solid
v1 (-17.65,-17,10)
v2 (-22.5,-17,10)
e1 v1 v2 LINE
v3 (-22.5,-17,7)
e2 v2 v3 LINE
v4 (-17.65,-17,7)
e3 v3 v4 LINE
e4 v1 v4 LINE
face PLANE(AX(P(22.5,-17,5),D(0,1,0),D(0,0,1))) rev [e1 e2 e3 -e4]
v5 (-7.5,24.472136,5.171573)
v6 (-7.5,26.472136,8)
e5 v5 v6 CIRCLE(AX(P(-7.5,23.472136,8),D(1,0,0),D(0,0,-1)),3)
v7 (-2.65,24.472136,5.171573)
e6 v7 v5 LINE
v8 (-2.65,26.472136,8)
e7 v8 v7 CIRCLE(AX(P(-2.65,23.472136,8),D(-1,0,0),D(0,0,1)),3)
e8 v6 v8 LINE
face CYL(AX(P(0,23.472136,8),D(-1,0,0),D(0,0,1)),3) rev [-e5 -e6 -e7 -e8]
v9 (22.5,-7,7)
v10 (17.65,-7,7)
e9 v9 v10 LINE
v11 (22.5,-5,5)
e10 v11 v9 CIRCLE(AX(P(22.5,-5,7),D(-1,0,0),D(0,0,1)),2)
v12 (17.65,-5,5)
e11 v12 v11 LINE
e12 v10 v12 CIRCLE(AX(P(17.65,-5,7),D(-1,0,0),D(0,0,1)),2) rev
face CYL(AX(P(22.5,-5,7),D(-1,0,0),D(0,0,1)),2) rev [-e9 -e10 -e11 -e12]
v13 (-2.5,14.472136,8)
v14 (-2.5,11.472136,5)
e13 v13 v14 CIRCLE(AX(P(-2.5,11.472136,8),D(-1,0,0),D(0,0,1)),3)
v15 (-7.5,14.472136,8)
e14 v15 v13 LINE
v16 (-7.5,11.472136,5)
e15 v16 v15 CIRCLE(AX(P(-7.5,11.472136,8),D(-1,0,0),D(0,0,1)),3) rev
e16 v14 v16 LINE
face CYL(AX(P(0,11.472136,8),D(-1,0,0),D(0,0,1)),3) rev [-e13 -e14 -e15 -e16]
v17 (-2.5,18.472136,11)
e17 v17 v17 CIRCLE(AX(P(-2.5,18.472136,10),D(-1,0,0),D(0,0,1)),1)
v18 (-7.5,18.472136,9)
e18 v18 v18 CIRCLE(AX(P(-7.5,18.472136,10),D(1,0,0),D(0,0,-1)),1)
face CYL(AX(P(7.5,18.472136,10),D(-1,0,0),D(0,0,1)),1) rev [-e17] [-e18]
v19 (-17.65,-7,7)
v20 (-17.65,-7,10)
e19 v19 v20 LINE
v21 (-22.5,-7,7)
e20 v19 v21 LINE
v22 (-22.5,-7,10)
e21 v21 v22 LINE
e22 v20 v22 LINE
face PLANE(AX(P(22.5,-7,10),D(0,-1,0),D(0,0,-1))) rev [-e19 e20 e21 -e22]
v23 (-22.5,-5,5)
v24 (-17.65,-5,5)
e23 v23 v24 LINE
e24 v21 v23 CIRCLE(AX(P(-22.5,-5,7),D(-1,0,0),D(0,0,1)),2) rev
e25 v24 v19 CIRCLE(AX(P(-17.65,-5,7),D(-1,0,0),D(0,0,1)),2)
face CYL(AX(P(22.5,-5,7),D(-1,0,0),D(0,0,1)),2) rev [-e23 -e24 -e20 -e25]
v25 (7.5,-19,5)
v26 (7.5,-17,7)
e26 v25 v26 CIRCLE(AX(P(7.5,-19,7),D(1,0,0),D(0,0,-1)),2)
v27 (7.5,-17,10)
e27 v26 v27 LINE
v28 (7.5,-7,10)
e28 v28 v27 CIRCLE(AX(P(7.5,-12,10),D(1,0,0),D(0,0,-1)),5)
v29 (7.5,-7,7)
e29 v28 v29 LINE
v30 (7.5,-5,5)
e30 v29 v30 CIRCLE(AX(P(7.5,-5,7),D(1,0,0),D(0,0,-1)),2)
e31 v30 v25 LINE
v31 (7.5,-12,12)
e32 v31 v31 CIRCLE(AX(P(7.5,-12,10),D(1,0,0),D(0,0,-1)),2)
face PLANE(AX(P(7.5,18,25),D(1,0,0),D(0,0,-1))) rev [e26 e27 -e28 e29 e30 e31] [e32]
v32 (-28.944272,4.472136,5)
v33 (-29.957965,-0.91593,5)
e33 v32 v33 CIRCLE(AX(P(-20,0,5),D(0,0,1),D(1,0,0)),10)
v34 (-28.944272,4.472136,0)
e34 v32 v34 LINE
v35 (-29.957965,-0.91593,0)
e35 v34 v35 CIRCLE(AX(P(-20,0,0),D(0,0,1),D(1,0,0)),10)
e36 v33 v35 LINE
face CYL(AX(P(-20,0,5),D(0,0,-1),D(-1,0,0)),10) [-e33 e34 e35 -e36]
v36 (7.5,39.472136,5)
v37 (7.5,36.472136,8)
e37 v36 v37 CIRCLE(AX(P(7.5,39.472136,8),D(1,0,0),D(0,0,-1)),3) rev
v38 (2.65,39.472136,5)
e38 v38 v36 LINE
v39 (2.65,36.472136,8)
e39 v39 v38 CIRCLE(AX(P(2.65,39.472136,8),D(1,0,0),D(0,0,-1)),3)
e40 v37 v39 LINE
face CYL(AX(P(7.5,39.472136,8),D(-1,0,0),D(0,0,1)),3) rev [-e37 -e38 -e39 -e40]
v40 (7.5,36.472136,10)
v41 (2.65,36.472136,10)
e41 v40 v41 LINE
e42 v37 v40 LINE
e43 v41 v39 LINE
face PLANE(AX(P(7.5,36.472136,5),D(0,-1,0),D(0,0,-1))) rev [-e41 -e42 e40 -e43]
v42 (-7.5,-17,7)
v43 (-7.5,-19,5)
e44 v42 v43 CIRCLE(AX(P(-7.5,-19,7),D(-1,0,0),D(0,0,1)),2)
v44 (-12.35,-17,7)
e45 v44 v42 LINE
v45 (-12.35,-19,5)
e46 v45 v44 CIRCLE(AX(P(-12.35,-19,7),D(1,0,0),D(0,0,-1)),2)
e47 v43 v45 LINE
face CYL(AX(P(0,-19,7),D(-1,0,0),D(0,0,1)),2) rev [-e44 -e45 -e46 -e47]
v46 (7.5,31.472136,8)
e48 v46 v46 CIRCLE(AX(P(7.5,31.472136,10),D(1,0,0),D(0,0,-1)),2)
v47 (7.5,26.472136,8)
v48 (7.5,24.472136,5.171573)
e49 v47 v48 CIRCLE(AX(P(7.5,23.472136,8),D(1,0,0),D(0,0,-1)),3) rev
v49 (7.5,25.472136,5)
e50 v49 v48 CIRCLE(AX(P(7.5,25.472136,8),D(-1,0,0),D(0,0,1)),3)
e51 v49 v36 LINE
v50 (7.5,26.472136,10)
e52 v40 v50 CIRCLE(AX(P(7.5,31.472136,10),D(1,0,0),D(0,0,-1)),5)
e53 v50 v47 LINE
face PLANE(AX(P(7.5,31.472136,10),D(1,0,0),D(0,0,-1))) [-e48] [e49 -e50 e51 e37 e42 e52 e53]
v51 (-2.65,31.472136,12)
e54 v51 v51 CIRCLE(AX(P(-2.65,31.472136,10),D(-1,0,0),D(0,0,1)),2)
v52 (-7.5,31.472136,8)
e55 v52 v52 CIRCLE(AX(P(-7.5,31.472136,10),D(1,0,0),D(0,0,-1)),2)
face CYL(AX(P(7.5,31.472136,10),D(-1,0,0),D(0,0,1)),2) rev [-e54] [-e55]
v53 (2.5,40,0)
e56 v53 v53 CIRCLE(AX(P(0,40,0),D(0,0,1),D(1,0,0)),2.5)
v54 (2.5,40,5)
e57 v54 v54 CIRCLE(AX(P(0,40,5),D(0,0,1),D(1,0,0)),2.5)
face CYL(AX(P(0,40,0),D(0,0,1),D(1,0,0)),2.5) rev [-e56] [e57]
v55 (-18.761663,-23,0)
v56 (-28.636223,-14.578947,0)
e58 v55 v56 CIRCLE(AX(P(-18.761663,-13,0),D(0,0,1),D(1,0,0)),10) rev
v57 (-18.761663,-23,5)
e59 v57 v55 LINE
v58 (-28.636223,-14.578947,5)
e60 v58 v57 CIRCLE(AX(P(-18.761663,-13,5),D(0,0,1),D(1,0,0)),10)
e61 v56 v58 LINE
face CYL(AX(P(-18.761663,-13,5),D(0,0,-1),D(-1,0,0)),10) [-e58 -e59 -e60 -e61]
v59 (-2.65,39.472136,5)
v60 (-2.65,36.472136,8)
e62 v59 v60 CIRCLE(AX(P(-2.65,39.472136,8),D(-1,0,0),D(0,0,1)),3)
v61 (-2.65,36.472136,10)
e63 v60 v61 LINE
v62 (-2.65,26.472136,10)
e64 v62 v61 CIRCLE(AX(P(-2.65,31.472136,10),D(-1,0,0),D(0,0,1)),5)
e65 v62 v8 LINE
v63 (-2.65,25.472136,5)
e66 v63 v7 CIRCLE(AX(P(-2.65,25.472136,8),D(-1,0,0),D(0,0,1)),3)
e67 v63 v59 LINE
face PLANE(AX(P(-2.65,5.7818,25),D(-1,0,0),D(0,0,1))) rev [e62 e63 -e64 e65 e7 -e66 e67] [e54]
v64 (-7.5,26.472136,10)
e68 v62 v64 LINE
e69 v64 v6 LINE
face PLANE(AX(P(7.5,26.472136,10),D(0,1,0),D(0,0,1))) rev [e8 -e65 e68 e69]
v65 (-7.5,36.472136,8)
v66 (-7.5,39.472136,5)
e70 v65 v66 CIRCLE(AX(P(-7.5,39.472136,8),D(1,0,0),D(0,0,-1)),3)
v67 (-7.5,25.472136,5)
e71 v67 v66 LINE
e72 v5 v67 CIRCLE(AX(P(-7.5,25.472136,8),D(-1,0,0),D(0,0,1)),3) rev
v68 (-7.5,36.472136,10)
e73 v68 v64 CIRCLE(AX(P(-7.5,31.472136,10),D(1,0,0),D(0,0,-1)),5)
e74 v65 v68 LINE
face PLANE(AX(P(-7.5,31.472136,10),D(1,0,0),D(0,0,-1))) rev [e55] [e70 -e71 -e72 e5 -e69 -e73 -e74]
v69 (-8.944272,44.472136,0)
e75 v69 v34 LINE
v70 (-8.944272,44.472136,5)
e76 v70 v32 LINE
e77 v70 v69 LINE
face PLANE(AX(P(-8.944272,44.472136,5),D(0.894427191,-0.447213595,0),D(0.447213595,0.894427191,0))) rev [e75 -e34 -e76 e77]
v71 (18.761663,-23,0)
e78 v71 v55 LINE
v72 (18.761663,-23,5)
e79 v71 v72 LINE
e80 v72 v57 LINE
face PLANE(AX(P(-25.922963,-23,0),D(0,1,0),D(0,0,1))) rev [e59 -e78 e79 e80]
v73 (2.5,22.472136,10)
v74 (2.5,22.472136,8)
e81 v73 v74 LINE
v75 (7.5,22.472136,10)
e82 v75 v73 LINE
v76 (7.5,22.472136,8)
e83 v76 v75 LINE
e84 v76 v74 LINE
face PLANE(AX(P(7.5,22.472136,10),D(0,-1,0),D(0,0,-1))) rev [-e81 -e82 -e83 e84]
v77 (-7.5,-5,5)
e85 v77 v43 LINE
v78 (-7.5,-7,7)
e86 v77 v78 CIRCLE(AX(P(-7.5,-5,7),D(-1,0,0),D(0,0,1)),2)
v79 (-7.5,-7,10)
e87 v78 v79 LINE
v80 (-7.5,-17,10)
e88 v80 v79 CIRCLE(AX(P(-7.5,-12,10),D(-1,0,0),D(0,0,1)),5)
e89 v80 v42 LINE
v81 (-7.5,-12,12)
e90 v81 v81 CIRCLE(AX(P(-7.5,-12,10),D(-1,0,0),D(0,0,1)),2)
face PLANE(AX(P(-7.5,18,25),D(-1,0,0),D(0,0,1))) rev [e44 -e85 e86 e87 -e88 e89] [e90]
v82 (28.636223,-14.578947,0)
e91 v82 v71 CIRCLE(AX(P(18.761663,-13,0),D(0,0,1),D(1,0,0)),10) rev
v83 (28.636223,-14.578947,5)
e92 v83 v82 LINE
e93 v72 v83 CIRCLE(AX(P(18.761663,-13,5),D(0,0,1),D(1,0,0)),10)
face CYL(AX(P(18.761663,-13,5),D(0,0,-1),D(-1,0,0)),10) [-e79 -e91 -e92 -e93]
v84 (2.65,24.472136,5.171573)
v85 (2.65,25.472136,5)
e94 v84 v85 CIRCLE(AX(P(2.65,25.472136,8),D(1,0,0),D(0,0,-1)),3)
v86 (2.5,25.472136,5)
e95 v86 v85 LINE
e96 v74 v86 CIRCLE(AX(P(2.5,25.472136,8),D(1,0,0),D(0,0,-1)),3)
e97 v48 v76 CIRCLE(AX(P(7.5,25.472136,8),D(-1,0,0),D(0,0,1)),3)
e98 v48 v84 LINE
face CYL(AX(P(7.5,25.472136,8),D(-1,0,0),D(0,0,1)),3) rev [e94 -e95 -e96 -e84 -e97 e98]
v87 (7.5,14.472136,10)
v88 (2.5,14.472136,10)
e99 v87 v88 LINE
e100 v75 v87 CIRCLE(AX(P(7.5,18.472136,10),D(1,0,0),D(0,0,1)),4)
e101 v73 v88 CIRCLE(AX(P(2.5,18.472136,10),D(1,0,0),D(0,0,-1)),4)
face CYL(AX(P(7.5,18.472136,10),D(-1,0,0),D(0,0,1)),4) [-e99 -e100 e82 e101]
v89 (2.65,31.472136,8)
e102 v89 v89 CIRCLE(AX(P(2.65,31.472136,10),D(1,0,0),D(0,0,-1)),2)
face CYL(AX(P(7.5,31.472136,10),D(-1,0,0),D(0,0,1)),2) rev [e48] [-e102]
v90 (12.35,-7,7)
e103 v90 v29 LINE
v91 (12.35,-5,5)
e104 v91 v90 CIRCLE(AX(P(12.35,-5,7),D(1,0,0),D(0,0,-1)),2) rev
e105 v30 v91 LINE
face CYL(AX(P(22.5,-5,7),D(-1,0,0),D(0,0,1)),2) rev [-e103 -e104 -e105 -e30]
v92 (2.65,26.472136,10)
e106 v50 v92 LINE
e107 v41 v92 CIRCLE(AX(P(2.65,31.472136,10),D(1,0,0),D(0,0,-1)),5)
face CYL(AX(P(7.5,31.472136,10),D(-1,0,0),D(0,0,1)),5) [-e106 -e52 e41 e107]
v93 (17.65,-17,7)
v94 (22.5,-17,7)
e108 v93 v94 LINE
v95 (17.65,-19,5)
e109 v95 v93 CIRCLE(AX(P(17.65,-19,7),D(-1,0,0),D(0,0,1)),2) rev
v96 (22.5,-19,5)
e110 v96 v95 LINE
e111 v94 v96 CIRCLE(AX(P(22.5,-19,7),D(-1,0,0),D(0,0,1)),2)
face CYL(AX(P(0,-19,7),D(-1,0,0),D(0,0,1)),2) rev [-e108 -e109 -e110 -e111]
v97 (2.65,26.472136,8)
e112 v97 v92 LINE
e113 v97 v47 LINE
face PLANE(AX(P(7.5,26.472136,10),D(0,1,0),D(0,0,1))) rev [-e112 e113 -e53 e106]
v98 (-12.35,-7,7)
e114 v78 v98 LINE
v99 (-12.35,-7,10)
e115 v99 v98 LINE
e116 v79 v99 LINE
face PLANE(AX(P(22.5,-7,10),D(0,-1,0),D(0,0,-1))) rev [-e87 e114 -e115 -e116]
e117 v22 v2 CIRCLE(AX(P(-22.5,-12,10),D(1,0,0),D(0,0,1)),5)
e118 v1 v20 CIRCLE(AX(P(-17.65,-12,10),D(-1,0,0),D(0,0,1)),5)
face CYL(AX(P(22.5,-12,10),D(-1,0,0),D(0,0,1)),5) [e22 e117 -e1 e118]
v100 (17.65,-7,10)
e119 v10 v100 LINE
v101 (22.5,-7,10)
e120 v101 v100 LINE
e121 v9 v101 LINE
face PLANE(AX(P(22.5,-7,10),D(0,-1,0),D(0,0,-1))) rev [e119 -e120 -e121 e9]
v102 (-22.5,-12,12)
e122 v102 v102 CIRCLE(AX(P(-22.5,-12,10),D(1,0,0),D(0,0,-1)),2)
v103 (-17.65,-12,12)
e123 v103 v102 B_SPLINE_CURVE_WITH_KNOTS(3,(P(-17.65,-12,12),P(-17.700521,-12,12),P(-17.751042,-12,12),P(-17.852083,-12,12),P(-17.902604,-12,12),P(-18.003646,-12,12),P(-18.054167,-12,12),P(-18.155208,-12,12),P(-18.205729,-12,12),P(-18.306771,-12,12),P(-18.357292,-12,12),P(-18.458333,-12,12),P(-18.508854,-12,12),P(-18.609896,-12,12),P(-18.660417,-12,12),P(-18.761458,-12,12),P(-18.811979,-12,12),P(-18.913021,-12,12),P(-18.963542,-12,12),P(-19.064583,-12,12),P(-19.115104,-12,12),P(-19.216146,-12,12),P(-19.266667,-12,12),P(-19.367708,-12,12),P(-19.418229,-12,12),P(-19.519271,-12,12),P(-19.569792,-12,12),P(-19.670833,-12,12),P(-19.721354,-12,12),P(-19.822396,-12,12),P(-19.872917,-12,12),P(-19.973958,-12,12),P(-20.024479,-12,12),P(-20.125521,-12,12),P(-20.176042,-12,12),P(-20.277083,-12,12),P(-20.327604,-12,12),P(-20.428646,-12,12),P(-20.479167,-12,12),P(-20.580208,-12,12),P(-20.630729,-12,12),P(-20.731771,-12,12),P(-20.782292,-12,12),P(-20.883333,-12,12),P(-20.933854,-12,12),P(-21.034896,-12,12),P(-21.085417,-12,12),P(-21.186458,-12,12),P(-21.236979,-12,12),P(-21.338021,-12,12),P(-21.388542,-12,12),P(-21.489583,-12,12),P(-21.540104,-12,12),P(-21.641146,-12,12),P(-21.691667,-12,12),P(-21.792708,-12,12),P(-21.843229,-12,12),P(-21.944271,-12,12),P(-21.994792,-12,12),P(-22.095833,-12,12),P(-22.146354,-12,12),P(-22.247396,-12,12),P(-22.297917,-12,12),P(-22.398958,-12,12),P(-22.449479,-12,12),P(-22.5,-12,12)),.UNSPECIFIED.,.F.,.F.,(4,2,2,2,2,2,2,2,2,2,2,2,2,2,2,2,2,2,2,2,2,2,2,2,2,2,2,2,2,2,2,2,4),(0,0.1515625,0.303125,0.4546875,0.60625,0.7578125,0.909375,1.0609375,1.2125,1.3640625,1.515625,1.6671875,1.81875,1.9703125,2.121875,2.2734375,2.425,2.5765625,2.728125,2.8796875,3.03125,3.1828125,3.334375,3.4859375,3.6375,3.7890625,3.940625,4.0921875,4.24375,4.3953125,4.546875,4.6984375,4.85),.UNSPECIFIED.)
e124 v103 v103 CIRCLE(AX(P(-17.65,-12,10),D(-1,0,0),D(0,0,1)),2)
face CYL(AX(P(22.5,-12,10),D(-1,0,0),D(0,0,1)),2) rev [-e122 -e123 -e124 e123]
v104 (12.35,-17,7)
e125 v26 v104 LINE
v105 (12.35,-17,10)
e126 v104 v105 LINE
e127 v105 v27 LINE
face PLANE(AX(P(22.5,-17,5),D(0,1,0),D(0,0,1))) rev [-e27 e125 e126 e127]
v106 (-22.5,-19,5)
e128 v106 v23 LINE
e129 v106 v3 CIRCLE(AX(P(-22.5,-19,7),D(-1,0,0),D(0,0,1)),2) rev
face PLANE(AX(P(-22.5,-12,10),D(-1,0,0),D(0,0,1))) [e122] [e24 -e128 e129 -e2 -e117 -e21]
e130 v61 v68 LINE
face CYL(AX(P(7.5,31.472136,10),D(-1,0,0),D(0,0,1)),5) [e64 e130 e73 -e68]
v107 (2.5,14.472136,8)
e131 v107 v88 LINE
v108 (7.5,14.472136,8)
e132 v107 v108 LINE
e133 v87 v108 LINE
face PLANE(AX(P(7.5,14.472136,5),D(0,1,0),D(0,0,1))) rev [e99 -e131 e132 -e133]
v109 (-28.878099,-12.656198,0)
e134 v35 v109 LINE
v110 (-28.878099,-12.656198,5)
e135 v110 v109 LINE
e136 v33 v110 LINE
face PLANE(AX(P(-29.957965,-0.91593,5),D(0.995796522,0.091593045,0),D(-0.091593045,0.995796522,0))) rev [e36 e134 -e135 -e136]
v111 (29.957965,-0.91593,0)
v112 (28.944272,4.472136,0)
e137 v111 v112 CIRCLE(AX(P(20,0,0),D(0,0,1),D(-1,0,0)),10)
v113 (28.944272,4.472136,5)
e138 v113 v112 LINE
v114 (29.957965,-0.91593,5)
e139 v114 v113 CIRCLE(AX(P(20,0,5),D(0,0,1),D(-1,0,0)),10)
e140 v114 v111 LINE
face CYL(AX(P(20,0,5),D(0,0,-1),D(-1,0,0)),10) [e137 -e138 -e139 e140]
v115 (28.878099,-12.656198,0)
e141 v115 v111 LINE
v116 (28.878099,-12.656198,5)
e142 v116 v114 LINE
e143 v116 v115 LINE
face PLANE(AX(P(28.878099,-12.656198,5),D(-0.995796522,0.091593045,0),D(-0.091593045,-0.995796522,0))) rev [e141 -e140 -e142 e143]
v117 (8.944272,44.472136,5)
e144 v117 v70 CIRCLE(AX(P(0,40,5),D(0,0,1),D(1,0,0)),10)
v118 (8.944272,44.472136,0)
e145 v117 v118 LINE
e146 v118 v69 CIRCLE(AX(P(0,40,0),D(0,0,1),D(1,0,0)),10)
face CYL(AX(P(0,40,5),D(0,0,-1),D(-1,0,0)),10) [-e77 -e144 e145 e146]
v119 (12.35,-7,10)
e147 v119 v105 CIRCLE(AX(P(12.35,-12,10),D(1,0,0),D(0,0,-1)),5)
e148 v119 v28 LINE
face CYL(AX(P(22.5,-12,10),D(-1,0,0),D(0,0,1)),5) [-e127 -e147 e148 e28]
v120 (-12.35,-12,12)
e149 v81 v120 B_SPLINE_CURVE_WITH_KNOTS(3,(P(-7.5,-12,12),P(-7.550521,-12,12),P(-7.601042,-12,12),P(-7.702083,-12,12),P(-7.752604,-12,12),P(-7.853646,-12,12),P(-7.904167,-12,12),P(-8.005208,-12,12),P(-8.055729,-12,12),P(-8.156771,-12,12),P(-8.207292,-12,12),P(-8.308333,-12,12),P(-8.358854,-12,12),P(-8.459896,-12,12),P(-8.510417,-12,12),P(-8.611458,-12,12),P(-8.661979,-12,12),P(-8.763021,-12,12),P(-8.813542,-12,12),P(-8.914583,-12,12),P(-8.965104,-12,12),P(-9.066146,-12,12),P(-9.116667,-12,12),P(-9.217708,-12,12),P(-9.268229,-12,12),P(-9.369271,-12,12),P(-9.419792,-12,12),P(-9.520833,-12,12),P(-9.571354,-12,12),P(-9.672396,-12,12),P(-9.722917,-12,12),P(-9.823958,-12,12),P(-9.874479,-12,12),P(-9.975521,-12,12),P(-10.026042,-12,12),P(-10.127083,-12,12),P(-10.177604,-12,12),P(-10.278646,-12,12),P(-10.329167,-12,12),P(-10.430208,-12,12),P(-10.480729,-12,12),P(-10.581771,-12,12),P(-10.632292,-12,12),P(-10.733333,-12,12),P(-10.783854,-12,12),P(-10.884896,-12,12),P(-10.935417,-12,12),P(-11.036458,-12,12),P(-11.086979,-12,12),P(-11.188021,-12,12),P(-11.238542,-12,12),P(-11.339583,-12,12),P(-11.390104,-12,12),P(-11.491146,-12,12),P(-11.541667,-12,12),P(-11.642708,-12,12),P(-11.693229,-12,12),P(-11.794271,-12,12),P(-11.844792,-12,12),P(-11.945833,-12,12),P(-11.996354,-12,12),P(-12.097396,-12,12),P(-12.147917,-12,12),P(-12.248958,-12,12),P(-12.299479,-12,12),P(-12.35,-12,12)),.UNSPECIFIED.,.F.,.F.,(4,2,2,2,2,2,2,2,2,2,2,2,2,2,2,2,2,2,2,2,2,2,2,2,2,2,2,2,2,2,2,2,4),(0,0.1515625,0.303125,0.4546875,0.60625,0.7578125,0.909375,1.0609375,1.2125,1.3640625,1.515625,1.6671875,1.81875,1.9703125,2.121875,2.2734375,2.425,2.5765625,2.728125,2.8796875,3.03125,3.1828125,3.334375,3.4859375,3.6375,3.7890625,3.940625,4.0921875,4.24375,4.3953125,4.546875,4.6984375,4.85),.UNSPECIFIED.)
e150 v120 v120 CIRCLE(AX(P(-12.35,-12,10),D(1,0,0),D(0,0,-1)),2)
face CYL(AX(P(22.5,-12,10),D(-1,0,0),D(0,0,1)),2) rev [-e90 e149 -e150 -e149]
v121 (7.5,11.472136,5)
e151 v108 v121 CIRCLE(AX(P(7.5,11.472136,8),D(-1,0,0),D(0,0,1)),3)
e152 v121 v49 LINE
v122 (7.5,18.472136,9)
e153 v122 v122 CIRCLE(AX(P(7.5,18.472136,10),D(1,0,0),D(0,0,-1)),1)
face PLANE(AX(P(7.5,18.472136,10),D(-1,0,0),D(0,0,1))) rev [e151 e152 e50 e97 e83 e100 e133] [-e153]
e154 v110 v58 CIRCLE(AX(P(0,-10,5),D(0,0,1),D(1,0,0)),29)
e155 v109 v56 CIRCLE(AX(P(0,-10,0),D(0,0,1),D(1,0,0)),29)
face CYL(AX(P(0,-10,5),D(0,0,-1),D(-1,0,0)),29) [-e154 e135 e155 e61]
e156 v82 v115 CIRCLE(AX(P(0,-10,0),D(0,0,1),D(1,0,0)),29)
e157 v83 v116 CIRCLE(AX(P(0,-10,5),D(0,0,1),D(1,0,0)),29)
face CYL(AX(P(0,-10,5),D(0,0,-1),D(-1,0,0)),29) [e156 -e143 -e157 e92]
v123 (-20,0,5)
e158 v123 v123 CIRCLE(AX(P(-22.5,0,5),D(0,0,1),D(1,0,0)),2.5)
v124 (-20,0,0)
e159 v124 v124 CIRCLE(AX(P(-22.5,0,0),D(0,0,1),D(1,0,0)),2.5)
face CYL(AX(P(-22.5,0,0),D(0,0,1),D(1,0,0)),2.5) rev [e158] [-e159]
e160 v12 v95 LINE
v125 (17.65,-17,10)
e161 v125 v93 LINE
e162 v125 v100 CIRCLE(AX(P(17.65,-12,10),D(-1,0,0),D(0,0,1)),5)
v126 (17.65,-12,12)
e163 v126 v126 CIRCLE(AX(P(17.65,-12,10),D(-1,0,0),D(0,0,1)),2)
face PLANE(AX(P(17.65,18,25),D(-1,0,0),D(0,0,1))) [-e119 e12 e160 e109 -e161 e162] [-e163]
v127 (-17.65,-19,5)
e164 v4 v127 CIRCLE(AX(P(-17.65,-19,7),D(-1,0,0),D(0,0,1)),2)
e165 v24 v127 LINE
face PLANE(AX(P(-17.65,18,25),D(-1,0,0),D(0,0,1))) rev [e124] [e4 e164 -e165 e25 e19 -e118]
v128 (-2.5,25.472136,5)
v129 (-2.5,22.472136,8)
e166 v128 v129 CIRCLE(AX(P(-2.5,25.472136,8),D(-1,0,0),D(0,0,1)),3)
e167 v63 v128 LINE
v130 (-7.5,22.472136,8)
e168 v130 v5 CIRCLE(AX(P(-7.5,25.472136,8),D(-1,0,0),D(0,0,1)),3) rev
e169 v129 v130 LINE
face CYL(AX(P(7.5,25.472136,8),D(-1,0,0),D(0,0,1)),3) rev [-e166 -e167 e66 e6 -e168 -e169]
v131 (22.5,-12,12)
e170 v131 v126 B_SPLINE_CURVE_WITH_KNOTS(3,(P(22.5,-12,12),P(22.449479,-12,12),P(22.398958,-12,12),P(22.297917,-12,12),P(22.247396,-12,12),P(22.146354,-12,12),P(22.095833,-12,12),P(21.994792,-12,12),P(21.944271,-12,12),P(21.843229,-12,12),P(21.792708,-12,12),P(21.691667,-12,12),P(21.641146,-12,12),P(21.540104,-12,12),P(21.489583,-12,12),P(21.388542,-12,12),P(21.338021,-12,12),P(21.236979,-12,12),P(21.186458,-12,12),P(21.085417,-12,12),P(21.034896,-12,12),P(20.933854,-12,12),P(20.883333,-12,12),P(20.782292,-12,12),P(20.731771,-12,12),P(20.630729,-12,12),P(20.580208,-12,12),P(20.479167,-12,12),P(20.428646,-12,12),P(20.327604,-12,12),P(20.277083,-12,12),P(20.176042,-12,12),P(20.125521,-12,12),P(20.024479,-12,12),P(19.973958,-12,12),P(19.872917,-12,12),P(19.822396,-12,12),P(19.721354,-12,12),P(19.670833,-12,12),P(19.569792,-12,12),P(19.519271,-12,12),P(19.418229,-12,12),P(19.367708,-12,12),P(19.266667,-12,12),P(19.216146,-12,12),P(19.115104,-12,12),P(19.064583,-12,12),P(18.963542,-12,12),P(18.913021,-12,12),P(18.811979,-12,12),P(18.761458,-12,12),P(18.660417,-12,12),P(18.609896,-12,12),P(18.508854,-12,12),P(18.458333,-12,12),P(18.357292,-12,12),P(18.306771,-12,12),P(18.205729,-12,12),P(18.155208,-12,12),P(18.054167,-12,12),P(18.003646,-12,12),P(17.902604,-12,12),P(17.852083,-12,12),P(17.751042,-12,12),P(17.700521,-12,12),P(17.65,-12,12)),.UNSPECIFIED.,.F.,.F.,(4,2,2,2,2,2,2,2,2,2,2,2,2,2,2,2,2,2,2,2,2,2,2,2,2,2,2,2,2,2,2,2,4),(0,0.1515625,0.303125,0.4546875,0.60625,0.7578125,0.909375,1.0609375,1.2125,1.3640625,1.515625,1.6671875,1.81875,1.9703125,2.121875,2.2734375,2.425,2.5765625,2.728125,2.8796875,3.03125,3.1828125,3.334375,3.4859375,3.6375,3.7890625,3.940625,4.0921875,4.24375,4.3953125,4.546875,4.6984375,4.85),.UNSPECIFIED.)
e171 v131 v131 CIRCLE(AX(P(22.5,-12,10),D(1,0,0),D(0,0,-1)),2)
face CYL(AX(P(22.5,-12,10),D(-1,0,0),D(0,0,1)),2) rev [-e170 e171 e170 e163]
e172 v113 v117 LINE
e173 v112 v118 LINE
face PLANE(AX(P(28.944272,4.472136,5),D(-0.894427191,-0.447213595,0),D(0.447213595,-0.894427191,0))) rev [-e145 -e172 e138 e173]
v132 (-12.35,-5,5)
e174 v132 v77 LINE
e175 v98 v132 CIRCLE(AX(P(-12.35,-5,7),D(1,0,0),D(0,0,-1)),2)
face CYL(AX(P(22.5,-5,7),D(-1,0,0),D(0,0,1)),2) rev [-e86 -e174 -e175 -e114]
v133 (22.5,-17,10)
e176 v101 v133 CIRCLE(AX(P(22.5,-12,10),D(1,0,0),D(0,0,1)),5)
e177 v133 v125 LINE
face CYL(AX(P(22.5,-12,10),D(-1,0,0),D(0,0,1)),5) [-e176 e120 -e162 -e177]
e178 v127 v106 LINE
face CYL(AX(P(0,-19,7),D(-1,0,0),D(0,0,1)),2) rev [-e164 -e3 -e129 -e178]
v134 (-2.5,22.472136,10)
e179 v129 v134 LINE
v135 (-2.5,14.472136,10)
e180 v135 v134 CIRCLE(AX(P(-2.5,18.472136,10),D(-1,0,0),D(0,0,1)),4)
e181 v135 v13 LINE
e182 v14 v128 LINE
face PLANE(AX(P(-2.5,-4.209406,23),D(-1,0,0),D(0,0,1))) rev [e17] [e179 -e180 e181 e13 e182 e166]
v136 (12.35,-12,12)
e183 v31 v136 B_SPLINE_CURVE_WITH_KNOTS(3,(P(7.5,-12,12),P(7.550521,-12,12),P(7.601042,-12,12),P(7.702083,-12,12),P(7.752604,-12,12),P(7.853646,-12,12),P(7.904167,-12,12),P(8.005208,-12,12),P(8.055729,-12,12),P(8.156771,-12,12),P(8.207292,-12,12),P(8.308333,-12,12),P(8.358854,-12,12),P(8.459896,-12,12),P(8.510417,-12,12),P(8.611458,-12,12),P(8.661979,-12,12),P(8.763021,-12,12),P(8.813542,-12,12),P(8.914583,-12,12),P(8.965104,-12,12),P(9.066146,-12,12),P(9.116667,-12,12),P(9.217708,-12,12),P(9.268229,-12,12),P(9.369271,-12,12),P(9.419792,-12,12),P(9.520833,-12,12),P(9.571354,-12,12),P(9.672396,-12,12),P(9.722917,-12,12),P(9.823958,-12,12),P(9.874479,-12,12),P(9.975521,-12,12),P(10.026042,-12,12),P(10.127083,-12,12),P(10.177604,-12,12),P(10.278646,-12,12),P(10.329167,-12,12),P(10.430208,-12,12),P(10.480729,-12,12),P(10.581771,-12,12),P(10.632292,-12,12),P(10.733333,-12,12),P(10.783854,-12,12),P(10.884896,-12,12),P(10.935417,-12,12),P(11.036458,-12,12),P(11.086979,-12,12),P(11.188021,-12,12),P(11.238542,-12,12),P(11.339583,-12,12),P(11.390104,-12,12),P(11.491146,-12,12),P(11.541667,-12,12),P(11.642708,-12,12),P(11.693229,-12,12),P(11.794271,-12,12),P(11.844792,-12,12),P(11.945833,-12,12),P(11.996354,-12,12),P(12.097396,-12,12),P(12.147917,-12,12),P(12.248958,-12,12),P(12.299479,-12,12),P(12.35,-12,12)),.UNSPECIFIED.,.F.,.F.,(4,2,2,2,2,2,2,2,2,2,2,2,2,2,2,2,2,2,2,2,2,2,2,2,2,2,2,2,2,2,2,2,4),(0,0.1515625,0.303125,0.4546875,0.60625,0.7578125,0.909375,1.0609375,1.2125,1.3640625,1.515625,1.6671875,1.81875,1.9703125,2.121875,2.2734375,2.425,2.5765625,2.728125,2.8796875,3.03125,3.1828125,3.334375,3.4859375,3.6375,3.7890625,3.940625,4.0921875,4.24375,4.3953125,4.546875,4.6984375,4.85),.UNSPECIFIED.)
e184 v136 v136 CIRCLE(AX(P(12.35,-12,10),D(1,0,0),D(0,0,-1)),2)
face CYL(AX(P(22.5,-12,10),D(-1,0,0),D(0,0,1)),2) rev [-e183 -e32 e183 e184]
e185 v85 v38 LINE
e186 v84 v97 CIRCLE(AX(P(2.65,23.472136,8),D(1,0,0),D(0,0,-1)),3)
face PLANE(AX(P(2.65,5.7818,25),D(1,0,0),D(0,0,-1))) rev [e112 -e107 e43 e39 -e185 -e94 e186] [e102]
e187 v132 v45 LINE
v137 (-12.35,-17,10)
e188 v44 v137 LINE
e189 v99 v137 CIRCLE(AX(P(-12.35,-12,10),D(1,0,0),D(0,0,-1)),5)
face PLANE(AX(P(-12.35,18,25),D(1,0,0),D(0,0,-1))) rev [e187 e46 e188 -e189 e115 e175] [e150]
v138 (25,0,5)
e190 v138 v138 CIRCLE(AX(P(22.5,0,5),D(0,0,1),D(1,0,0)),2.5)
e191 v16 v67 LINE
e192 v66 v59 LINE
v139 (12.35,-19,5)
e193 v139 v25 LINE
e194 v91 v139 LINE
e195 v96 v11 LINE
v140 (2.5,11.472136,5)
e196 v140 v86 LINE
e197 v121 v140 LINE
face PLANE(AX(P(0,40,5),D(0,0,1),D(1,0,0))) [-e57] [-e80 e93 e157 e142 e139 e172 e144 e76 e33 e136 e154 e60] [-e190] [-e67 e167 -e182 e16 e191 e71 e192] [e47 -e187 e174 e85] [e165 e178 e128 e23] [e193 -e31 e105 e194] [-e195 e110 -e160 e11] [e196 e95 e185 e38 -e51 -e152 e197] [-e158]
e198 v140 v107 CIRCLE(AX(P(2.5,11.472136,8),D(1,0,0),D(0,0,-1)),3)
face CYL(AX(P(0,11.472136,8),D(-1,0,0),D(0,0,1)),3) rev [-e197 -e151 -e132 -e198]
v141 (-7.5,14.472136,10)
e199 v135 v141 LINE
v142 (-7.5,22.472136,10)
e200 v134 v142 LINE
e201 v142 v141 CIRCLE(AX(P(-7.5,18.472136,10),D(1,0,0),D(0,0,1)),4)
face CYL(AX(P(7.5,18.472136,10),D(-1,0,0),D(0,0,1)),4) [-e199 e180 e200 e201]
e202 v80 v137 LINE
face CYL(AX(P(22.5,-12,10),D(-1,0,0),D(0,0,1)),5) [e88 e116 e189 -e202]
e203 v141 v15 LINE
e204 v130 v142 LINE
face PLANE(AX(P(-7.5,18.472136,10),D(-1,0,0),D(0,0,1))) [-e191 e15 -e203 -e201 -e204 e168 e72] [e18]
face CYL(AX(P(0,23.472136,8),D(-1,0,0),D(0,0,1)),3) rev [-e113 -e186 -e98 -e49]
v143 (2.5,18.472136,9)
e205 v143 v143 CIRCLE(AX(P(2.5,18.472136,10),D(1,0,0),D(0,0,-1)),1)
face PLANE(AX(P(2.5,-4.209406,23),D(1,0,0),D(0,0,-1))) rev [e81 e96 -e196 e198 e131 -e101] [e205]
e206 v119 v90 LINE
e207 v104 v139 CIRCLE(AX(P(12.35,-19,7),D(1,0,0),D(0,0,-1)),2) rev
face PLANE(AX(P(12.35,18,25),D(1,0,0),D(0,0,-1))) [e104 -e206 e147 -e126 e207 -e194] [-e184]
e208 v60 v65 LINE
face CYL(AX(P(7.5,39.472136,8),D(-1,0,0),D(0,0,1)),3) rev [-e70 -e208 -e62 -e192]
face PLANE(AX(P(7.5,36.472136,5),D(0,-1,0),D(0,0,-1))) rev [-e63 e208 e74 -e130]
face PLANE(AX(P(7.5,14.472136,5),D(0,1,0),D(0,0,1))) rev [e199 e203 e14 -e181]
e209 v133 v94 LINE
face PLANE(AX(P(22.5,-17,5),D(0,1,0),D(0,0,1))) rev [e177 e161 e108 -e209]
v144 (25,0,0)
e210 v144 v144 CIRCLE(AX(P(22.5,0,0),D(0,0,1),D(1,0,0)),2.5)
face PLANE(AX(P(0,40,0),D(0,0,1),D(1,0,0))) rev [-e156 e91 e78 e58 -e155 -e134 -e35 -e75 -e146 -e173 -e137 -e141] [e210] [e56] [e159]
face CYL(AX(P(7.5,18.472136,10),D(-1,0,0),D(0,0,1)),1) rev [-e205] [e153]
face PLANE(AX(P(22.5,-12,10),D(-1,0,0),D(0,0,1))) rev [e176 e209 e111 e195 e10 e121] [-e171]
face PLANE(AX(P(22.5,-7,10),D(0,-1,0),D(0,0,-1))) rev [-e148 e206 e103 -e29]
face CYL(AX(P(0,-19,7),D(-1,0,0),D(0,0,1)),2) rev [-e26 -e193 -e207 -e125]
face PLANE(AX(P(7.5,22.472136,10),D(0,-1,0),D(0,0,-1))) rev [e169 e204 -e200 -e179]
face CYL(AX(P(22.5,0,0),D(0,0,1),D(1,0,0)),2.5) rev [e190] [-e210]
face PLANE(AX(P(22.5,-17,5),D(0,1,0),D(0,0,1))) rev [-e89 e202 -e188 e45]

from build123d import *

# Parameters (mm, degrees)
BOSS_EXTRUDE1_DEPTH = 5
SKETCH2_R           = 2.5
CUT_EXTRUDE1_DEPTH  = 59.523499554
SKETCH3_R           = 1
BOSS_EXTRUDE2_DEPTH = 7.5
CUT_EXTRUDE3_REACH  = 71.82
SKETCH5_W           = 5
SKETCH5_H           = 18
FILLET1_R           = 3
SKETCH6_R           = 2
BOSS_EXTRUDE3_DEPTH = 7.5
SKETCH7_W           = 5.3
SKETCH7_H           = 20
CUT_EXTRUDE4_DEPTH  = 10
FILLET2_R           = 3
CUT_EXTRUDE5_DEPTH  = 60.160797831
FILLET4_R           = 10
SKETCH10_R          = 2
BOSS_EXTRUDE4_DEPTH = 22.5
SKETCH11_W          = 15
SKETCH11_H          = 20
SKETCH11_W_2        = 5.3
CUT_EXTRUDE6_DEPTH  = 10
FILLET5_R           = 2


with BuildPart() as part:
    # Sketch1 → Boss-Extrude1 (new body)
    with BuildSketch(Plane.XY):
        with BuildLine():
            Line((28.94427191, 4.472135955), (8.94427191, 44.472135955))
            ThreePointArc((8.94427191, 44.472135955), (0, 50), (-8.94427191, 44.472135955))
            Line((-8.94427191, 44.472135955), (-28.94427191, 4.472135955))
            ThreePointArc((-28.94427191, 4.472135955), (-29.827586533, 1.848930213), (-29.957965225, -0.915930449))
            Line((-29.957965225, -0.915930449), (-28.878099151, -12.656198302))
            ThreePointArc((-28.878099151, -12.656198302), (0, -39), (28.878099151, -12.656198302))
            Line((28.878099151, -12.656198302), (29.957965225, -0.915930449))
            ThreePointArc((29.957965225, -0.915930449), (29.827586533, 1.848930213), (28.94427191, 4.472135955))
        make_face()
    extrude(amount=BOSS_EXTRUDE1_DEPTH)

    # Sketch2 → Cut-Extrude1 (cut, through all)
    with BuildSketch(Plane.XY.offset(5)):
        with Locations((0, 40)):
            Circle(SKETCH2_R)
        with Locations((22.5, 0)):
            Circle(SKETCH2_R)
        with Locations((-22.5, 0)):
            Circle(SKETCH2_R)
    extrude(amount=-CUT_EXTRUDE1_DEPTH, mode=Mode.SUBTRACT)

    # Sketch3 → Boss-Extrude2 (add, symmetric)
    with BuildSketch(Plane(origin=(0, 0, 0), x_dir=(0, 0, -1), z_dir=(1, 0, 0))):
        with BuildLine():
            Line((-5, 22.472135955), (-5, 14.472135955))
            Line((-5, 14.472135955), (-10, 14.472135955))
            ThreePointArc((-10, 14.472135955), (-14, 18.472135955), (-10, 22.472135955))
            Line((-10, 22.472135955), (-5, 22.472135955))
        make_face()
        with Locations((-10, 18.472135955)):
            Circle(SKETCH3_R, mode=Mode.SUBTRACT)
    extrude(amount=BOSS_EXTRUDE2_DEPTH, both=True)

    # Cut-Extrude3: up to this face of the body (flat: up to its plane)
    cut_extrude3_end = Plane(part.part.faces().sort_by_distance((0, 14.472135955, 7.5))[0])
    # Sketch5 → Cut-Extrude3 (cut, up to the picked face)
    with BuildSketch(Plane(origin=(0, 22.472135955, 0), x_dir=(1, 0, 0), z_dir=(0, 1, 0)), mode=Mode.PRIVATE) as cut_extrude3_sk1:
        with Locations((0, -14)):
            Rectangle(SKETCH5_W, SKETCH5_H)
    cut_extrude3_tool1 = split(extrude(cut_extrude3_sk1.sketch, amount=-CUT_EXTRUDE3_REACH, mode=Mode.PRIVATE), bisect_by=cut_extrude3_end, keep=Keep.BOTH, mode=Mode.PRIVATE)
    add(cut_extrude3_tool1.solids().sort_by(Axis((0, 22.472136, 14), (0, -1, 0)))[0], mode=Mode.SUBTRACT)

    # Fillet1
    fillet1_edges = [part.edges().sort_by_distance(p)[0] for p in [
        (5, 22.472135955, 5),
        (5, 14.472135955, 5),
        (-5, 14.472135955, 5),
        (-5, 22.472135955, 5),
    ]]
    fillet(fillet1_edges, radius=FILLET1_R)

    # Sketch6 → Boss-Extrude3 (add, symmetric)
    with BuildSketch(Plane(origin=(0, 0, 0), x_dir=(0, 0, -1), z_dir=(1, 0, 0))):
        with BuildLine():
            Line((-5, 26.472135955), (-5, 36.472135955))
            Line((-5, 36.472135955), (-10, 36.472135955))
            ThreePointArc((-10, 36.472135955), (-15, 31.472135955), (-10, 26.472135955))
            Line((-10, 26.472135955), (-5, 26.472135955))
        make_face()
        with Locations((-10, 31.472135955)):
            Circle(SKETCH6_R, mode=Mode.SUBTRACT)
    extrude(amount=BOSS_EXTRUDE3_DEPTH, both=True)

    # Sketch7 → Cut-Extrude4 (cut)
    with BuildSketch(Plane(origin=(0, 36.472135955, 0), x_dir=(1, 0, 0), z_dir=(0, 1, 0))):
        with Locations((0, -15)):
            Rectangle(SKETCH7_W, SKETCH7_H)
    extrude(amount=-CUT_EXTRUDE4_DEPTH, mode=Mode.SUBTRACT)

    # Fillet2
    # the kernel refuses this fillet: 3 mm, written as the material it adds along each edge
    with BuildSketch(Plane(origin=(7.5, 26.472135955, 5), x_dir=(0, -1, 0), z_dir=(-1, 0, 0)), Plane(origin=(2.65, 36.472135955, 5), x_dir=(0, 1, 0), z_dir=(1, 0, 0)), Plane(origin=(-7.5, 36.472135955, 5), x_dir=(0, 1, 0), z_dir=(1, 0, 0)), Plane(origin=(-2.65, 26.472135955, 5), x_dir=(0, -1, 0), z_dir=(-1, 0, 0))) as fillet2_piece_1:
        with BuildLine():
            CenterArc((FILLET2_R, FILLET2_R), FILLET2_R, 180, 90)
            Line((0, FILLET2_R), (0, 0))
            Line((0, 0), (FILLET2_R, 0))
        make_face()
    extrude(amount=4.85)
    with BuildSketch(Plane(origin=(7.5, 26.472135955, 5), x_dir=(0, -1, 0), z_dir=(-1, 0, 0))) as fillet2_piece_2_section:
        with BuildLine():
            CenterArc((FILLET2_R, FILLET2_R), FILLET2_R, 180, 90)
            Line((0, FILLET2_R), (0, 0))
            Line((0, 0), (FILLET2_R, 0))
        make_face()
    fillet2_piece_2 = extrude(amount=12.35, mode=Mode.PRIVATE)
    fillet2_piece_2 = split(fillet2_piece_2, bisect_by=Plane(origin=(-2.65, 25.792950612, 5.679185343), z_dir=(-1, 0, 0)), keep=Keep.TOP, mode=Mode.PRIVATE)
    add(fillet2_piece_2)
    with BuildSketch(Plane(origin=(-4.85, 36.472135955, 5), x_dir=(0, 1, 0), z_dir=(1, 0, 0))) as fillet2_piece_3_section:
        with BuildLine():
            CenterArc((FILLET2_R, FILLET2_R), FILLET2_R, 180, 90)
            Line((0, FILLET2_R), (0, 0))
            Line((0, 0), (FILLET2_R, 0))
        make_face()
    fillet2_piece_3 = extrude(amount=12.35, mode=Mode.PRIVATE)
    fillet2_piece_3 = split(fillet2_piece_3, bisect_by=Plane(origin=(-2.65, 37.151321298, 5.679185343), z_dir=(-1, 0, 0)), keep=Keep.TOP, mode=Mode.PRIVATE)
    add(fillet2_piece_3)
    with BuildSketch(Plane(origin=(-7.5, 36.472135955, 5), x_dir=(0, 1, 0), z_dir=(1, 0, 0))) as fillet2_piece_4_section:
        with BuildLine():
            CenterArc((FILLET2_R, FILLET2_R), FILLET2_R, 180, 90)
            Line((0, FILLET2_R), (0, 0))
            Line((0, 0), (FILLET2_R, 0))
        make_face()
    fillet2_piece_4 = extrude(amount=12.35, mode=Mode.PRIVATE)
    fillet2_piece_4 = split(fillet2_piece_4, bisect_by=Plane(origin=(2.65, 37.151321298, 5.679185343), z_dir=(1, 0, 0)), keep=Keep.TOP, mode=Mode.PRIVATE)
    add(fillet2_piece_4)
    with BuildSketch(Plane(origin=(4.85, 26.472135955, 5), x_dir=(0, -1, 0), z_dir=(-1, 0, 0))) as fillet2_piece_5_section:
        with BuildLine():
            CenterArc((FILLET2_R, FILLET2_R), FILLET2_R, 180, 90)
            Line((0, FILLET2_R), (0, 0))
            Line((0, 0), (FILLET2_R, 0))
        make_face()
    fillet2_piece_5 = extrude(amount=12.35, mode=Mode.PRIVATE)
    fillet2_piece_5 = split(fillet2_piece_5, bisect_by=Plane(origin=(2.65, 25.792950612, 5.679185343), z_dir=(1, 0, 0)), keep=Keep.TOP, mode=Mode.PRIVATE)
    add(fillet2_piece_5)

    # Sketch8 → Cut-Extrude5 (cut, through all)
    with BuildSketch(Plane.XY.offset(5)):
        with BuildLine():
            Line((-25.922962794, -23), (25.922962794, -23))
            ThreePointArc((25.922962794, -23), (0, -39), (-25.922962794, -23))
        make_face()
    extrude(amount=-CUT_EXTRUDE5_DEPTH, mode=Mode.SUBTRACT)

    # Fillet4
    fillet4_edges = [part.edges().sort_by_distance(p)[0] for p in [
        (25.922962794, -23, 2.5),
        (-25.922962794, -23, 2.5),
    ]]
    fillet(fillet4_edges, radius=FILLET4_R)

    # Sketch10 → Boss-Extrude4 (add, symmetric)
    with BuildSketch(Plane(origin=(0, 0, 0), x_dir=(0, 0, -1), z_dir=(1, 0, 0))):
        with BuildLine():
            Line((-5, -17), (-10, -17))
            ThreePointArc((-10, -17), (-15, -12), (-10, -7))
            Line((-10, -7), (-5, -7))
            Line((-5, -7), (-5, -17))
        make_face()
        with Locations(Location((-10, -12, 0), (0, 0, 180))):
            Circle(SKETCH10_R, mode=Mode.SUBTRACT)
    extrude(amount=BOSS_EXTRUDE4_DEPTH, both=True)

    # Sketch11 → Cut-Extrude6 (cut)
    with BuildSketch(Plane.XZ.offset(17)):
        with Locations((0, 15)):
            Rectangle(SKETCH11_W, SKETCH11_H)
        with Locations((-15, 15)):
            Rectangle(SKETCH11_W_2, SKETCH11_H)
    cut_extrude6 = extrude(amount=-CUT_EXTRUDE6_DEPTH, mode=Mode.SUBTRACT)

    # Mirror1: Cut-Extrude6 across plane
    add(cut_extrude6.mirror(Plane(origin=(0, 0, 0), x_dir=(0, 0, 1), z_dir=(1, 0, 0))), mode=Mode.SUBTRACT)

    # Fillet5
    fillet5_edges = [part.edges().sort_by_distance(p)[0] for p in [
        (20.075, -17, 5),
        (20.075, -7, 5),
        (-9.925, -17, 5),
        (-20.075, -17, 5),
        (-9.925, -7, 5),
        (-20.075, -7, 5),
        (9.925, -7, 5),
        (9.925, -17, 5),
    ]]
    fillet(fillet5_edges, radius=FILLET5_R)


solid = part.part
